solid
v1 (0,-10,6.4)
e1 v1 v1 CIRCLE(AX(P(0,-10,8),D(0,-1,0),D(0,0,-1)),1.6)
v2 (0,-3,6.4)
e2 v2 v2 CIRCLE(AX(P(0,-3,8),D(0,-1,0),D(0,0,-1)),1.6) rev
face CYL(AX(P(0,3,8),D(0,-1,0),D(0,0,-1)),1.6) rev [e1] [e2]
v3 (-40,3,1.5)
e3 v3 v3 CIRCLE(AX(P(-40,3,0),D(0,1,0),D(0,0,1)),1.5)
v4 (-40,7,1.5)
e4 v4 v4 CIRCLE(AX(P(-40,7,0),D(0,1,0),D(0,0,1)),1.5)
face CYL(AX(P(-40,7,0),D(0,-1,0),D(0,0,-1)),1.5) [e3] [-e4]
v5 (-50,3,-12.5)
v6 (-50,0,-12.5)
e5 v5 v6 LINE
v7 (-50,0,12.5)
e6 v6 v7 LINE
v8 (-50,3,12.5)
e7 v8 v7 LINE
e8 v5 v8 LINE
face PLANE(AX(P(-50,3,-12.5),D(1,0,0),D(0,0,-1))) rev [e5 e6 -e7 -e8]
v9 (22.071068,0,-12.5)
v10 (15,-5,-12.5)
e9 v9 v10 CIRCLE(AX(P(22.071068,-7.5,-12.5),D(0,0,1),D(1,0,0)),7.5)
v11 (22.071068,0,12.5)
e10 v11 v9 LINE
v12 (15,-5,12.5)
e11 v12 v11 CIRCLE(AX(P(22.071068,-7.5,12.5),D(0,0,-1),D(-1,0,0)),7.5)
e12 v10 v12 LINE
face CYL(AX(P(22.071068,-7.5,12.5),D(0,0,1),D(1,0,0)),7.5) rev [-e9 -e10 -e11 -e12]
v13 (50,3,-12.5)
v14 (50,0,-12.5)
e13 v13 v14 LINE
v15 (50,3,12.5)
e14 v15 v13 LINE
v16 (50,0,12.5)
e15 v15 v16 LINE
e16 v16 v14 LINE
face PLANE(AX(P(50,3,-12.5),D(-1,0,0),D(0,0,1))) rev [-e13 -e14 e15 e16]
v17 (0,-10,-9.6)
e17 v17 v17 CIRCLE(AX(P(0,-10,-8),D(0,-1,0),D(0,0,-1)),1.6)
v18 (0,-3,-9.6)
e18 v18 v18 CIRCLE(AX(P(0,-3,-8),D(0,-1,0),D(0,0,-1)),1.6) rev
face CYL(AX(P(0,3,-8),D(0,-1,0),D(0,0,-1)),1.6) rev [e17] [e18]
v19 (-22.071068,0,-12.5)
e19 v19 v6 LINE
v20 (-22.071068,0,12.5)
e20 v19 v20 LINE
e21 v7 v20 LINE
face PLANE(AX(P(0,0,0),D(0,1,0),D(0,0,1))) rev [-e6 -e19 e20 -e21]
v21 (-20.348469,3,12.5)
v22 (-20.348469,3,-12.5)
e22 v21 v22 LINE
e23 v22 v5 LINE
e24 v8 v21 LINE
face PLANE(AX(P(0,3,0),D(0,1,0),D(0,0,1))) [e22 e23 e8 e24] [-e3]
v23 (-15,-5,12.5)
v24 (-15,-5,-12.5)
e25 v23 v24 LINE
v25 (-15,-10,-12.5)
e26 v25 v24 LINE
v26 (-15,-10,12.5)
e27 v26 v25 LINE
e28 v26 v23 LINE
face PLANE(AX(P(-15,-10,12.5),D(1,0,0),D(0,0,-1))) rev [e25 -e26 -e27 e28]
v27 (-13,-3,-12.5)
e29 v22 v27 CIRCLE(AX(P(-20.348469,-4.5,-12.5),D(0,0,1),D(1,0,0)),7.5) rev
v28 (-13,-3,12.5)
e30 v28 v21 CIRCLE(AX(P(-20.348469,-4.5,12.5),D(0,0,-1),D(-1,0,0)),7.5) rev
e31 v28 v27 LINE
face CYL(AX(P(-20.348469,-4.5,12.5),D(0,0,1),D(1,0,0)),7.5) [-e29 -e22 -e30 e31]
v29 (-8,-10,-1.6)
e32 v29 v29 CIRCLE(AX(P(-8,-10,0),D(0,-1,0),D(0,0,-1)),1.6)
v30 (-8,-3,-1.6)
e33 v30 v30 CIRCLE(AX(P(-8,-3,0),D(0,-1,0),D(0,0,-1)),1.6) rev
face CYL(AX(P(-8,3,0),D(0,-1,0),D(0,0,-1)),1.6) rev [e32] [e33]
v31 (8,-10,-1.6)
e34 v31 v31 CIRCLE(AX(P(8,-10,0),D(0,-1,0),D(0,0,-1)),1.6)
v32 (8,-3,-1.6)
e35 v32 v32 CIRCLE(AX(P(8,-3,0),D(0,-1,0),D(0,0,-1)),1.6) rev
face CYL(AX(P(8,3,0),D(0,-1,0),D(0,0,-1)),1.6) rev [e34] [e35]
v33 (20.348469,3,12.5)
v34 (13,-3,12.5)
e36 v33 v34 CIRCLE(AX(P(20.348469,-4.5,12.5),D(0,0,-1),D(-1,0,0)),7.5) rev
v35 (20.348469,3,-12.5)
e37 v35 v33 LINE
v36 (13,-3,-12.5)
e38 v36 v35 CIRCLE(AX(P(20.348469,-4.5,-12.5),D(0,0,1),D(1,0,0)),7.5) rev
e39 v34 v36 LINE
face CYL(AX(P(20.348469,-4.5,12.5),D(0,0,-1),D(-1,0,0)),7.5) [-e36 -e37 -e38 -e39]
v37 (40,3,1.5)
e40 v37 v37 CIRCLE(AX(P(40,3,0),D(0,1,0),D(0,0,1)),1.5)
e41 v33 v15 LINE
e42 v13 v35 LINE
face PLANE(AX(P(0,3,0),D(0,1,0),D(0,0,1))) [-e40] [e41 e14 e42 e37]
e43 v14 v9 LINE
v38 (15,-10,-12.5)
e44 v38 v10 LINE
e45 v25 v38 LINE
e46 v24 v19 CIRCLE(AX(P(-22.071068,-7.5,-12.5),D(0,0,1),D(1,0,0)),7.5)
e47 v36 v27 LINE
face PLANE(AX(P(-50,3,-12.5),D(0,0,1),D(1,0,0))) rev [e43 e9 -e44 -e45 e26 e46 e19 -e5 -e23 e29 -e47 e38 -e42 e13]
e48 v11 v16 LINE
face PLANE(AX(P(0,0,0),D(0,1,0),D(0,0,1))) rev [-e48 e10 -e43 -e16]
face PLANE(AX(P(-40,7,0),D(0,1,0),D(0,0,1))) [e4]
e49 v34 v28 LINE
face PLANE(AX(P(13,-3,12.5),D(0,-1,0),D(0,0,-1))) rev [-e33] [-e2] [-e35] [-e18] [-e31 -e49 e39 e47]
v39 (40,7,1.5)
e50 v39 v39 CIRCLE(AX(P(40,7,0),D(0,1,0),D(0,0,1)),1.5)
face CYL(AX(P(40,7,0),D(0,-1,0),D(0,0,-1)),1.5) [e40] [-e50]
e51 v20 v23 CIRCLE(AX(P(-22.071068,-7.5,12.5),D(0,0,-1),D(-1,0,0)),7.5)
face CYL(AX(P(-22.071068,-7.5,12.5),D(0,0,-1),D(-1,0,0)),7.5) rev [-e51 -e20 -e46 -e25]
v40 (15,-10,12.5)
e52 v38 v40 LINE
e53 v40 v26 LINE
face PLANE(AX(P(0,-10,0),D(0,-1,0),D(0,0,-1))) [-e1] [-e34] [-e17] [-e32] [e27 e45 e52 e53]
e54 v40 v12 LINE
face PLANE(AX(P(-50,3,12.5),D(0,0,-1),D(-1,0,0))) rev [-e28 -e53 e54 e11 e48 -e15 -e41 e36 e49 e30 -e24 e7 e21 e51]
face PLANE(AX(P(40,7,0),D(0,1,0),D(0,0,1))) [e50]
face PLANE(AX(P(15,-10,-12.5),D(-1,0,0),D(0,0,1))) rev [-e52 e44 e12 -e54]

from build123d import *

# Parameters (mm, degrees)
SKETCH1_W           = 100
SKETCH1_H           = 25
BOSS_EXTRUDE1_DEPTH = 3
SKETCH2_W           = 30
SKETCH2_H           = 25
BOSS_EXTRUDE2_DEPTH = 5
SKETCH5_R           = 1.6
CUT_EXTRUDE2_DEPTH  = 53.156015952
SKETCH6_W           = 26
SKETCH6_H           = 6
CUT_EXTRUDE3_DEPTH  = 57.124860802
FILLET1_R           = 7.5
SKETCH7_R           = 1.5
BOSS_EXTRUDE3_DEPTH = 4
BOSS_EXTRUDE4_START = 5
SKETCH9_W           = 30
SKETCH9_H           = 25
SKETCH9_R           = 1.6
BOSS_EXTRUDE4_DEPTH = 5


with BuildPart() as part:
    # Sketch1 → Boss-Extrude1 (new body)
    with BuildSketch(Plane(origin=(0, 0, 0), x_dir=(1, 0, 0), z_dir=(0, 1, 0))):
        Rectangle(SKETCH1_W, SKETCH1_H)
    extrude(amount=BOSS_EXTRUDE1_DEPTH)

    # Sketch2 → Boss-Extrude2 (add)
    with BuildSketch(Plane.XZ):
        Rectangle(SKETCH2_W, SKETCH2_H)
    extrude(amount=BOSS_EXTRUDE2_DEPTH)

    # Sketch5 → Cut-Extrude2 (cut, through all)
    with BuildSketch(Plane.XZ.offset(5)):
        with Locations(Location((8, 0, 0), (0, 0, 270))):
            Circle(SKETCH5_R)
        with Locations(Location((0, -8, 0), (0, 0, 270))):
            Circle(SKETCH5_R)
        with Locations(Location((-8, 0, 0), (0, 0, 270))):
            Circle(SKETCH5_R)
        with Locations(Location((0, 8, 0), (0, 0, 270))):
            Circle(SKETCH5_R)
    extrude(amount=-CUT_EXTRUDE2_DEPTH, mode=Mode.SUBTRACT)

    # Sketch6 → Cut-Extrude3 (cut, through all)
    with BuildSketch(Plane(origin=(0, 0, -12.5), x_dir=(-1, 0, 0), z_dir=(0, 0, -1))):
        Rectangle(SKETCH6_W, SKETCH6_H)
    extrude(amount=-CUT_EXTRUDE3_DEPTH, mode=Mode.SUBTRACT)

    # Fillet1
    # the kernel refuses this fillet: 7.5 mm, written as the material it adds along each edge
    with BuildSketch(Plane(origin=(-15, 0, -12.5), x_dir=(-1, 0, 0), z_dir=(0, 0, 1))) as fillet1_piece_1:
        with BuildLine():
            CenterArc((7.071067812, 7.5), FILLET1_R, 199.471220634, 70.528779366)
            Line((0, 5), (-0.141421356, 4.95))
            ThreePointArc((-0.141421356, 4.95), (-0.15, 2.5), (-0.15, 0))
            Line((-0.15, 0), (0, -0.15))
            Line((0, -0.15), (7.071067812, -0.15))
            Line((7.071067812, -0.15), (7.071067812, 0))
        make_face()
    extrude(amount=25)
    with BuildSketch(Plane(origin=(15, 0, 12.5), x_dir=(0, -1, 0), z_dir=(0, 0, -1))) as fillet1_piece_2:
        with BuildLine():
            CenterArc((7.5, -7.071067812), FILLET1_R, 109.471220634, 70.528779366)
            Line((0, -7.071067812), (-0.15, -7.071067812))
            Line((-0.15, -7.071067812), (-0.15, 0))
            Line((-0.15, 0), (0, 0.15))
            ThreePointArc((0, 0.15), (2.5, 0.15), (4.95, 0.141421356))
            Line((4.95, 0.141421356), (5, 0))
        make_face()
    extrude(amount=25)
    # the kernel refuses this fillet: 7.5 mm, written as the material it takes off along each edge
    with BuildSketch(Plane(origin=(-13, 3, -30.871173071), x_dir=(-1.5711876244490177e-12, -1.0, 0), z_dir=(0, 0, 1))) as fillet1_2_piece_1:
        with BuildLine():
            CenterArc((7.5, -7.348469228), FILLET1_R, 101.536959033, 78.463040967)
            Line((0, -7.348469228), (-0.15, -7.348469228))
            Line((-0.15, -7.348469228), (-0.15, 0))
            Line((-0.15, 0), (0, 0.15))
            ThreePointArc((0, 0.15), (3, 0.15), (5.97, 0.146969385))
            Line((5.97, 0.146969385), (6, 0))
        make_face()
    extrude(amount=61.742346142, mode=Mode.SUBTRACT)
    with BuildSketch(Plane(origin=(13, 3, -30.871173071), x_dir=(1, 0, 0), z_dir=(0, 0, 1))) as fillet1_2_piece_2:
        with BuildLine():
            CenterArc((7.348469228, -7.5), FILLET1_R, 90, 78.463040967)
            Line((0, -6), (-0.146969385, -5.97))
            ThreePointArc((-0.146969385, -5.97), (-0.15, -3), (-0.15, 0))
            Line((-0.15, 0), (0, 0.15))
            Line((0, 0.15), (7.348469228, 0.15))
            Line((7.348469228, 0.15), (7.348469228, 0))
        make_face()
    extrude(amount=61.742346142, mode=Mode.SUBTRACT)

    # Sketch7 → Boss-Extrude3 (add)
    with BuildSketch(Plane(origin=(0, 3, 0), x_dir=(1, 0, 0), z_dir=(0, 1, 0))):
        with Locations(Location((-40, 0, 0), (0, 0, 270))):
            Circle(SKETCH7_R)
        with Locations(Location((40, 0, 0), (0, 0, 270))):
            Circle(SKETCH7_R)
    extrude(amount=BOSS_EXTRUDE3_DEPTH)

    # Sketch9 → Boss-Extrude4 (add)
    with BuildSketch(Plane.XZ.offset(5).offset(BOSS_EXTRUDE4_START)):
        Rectangle(SKETCH9_W, SKETCH9_H)
        with Locations(Location((0, -8, 0), (0, 0, 270))):
            Circle(SKETCH9_R, mode=Mode.SUBTRACT)
        with Locations(Location((-8, 0, 0), (0, 0, 270))):
            Circle(SKETCH9_R, mode=Mode.SUBTRACT)
        with Locations(Location((8, 0, 0), (0, 0, 270))):
            Circle(SKETCH9_R, mode=Mode.SUBTRACT)
        with Locations(Location((0, 8, 0), (0, 0, 270))):
            Circle(SKETCH9_R, mode=Mode.SUBTRACT)
    extrude(amount=-BOSS_EXTRUDE4_DEPTH)


solid = part.part
